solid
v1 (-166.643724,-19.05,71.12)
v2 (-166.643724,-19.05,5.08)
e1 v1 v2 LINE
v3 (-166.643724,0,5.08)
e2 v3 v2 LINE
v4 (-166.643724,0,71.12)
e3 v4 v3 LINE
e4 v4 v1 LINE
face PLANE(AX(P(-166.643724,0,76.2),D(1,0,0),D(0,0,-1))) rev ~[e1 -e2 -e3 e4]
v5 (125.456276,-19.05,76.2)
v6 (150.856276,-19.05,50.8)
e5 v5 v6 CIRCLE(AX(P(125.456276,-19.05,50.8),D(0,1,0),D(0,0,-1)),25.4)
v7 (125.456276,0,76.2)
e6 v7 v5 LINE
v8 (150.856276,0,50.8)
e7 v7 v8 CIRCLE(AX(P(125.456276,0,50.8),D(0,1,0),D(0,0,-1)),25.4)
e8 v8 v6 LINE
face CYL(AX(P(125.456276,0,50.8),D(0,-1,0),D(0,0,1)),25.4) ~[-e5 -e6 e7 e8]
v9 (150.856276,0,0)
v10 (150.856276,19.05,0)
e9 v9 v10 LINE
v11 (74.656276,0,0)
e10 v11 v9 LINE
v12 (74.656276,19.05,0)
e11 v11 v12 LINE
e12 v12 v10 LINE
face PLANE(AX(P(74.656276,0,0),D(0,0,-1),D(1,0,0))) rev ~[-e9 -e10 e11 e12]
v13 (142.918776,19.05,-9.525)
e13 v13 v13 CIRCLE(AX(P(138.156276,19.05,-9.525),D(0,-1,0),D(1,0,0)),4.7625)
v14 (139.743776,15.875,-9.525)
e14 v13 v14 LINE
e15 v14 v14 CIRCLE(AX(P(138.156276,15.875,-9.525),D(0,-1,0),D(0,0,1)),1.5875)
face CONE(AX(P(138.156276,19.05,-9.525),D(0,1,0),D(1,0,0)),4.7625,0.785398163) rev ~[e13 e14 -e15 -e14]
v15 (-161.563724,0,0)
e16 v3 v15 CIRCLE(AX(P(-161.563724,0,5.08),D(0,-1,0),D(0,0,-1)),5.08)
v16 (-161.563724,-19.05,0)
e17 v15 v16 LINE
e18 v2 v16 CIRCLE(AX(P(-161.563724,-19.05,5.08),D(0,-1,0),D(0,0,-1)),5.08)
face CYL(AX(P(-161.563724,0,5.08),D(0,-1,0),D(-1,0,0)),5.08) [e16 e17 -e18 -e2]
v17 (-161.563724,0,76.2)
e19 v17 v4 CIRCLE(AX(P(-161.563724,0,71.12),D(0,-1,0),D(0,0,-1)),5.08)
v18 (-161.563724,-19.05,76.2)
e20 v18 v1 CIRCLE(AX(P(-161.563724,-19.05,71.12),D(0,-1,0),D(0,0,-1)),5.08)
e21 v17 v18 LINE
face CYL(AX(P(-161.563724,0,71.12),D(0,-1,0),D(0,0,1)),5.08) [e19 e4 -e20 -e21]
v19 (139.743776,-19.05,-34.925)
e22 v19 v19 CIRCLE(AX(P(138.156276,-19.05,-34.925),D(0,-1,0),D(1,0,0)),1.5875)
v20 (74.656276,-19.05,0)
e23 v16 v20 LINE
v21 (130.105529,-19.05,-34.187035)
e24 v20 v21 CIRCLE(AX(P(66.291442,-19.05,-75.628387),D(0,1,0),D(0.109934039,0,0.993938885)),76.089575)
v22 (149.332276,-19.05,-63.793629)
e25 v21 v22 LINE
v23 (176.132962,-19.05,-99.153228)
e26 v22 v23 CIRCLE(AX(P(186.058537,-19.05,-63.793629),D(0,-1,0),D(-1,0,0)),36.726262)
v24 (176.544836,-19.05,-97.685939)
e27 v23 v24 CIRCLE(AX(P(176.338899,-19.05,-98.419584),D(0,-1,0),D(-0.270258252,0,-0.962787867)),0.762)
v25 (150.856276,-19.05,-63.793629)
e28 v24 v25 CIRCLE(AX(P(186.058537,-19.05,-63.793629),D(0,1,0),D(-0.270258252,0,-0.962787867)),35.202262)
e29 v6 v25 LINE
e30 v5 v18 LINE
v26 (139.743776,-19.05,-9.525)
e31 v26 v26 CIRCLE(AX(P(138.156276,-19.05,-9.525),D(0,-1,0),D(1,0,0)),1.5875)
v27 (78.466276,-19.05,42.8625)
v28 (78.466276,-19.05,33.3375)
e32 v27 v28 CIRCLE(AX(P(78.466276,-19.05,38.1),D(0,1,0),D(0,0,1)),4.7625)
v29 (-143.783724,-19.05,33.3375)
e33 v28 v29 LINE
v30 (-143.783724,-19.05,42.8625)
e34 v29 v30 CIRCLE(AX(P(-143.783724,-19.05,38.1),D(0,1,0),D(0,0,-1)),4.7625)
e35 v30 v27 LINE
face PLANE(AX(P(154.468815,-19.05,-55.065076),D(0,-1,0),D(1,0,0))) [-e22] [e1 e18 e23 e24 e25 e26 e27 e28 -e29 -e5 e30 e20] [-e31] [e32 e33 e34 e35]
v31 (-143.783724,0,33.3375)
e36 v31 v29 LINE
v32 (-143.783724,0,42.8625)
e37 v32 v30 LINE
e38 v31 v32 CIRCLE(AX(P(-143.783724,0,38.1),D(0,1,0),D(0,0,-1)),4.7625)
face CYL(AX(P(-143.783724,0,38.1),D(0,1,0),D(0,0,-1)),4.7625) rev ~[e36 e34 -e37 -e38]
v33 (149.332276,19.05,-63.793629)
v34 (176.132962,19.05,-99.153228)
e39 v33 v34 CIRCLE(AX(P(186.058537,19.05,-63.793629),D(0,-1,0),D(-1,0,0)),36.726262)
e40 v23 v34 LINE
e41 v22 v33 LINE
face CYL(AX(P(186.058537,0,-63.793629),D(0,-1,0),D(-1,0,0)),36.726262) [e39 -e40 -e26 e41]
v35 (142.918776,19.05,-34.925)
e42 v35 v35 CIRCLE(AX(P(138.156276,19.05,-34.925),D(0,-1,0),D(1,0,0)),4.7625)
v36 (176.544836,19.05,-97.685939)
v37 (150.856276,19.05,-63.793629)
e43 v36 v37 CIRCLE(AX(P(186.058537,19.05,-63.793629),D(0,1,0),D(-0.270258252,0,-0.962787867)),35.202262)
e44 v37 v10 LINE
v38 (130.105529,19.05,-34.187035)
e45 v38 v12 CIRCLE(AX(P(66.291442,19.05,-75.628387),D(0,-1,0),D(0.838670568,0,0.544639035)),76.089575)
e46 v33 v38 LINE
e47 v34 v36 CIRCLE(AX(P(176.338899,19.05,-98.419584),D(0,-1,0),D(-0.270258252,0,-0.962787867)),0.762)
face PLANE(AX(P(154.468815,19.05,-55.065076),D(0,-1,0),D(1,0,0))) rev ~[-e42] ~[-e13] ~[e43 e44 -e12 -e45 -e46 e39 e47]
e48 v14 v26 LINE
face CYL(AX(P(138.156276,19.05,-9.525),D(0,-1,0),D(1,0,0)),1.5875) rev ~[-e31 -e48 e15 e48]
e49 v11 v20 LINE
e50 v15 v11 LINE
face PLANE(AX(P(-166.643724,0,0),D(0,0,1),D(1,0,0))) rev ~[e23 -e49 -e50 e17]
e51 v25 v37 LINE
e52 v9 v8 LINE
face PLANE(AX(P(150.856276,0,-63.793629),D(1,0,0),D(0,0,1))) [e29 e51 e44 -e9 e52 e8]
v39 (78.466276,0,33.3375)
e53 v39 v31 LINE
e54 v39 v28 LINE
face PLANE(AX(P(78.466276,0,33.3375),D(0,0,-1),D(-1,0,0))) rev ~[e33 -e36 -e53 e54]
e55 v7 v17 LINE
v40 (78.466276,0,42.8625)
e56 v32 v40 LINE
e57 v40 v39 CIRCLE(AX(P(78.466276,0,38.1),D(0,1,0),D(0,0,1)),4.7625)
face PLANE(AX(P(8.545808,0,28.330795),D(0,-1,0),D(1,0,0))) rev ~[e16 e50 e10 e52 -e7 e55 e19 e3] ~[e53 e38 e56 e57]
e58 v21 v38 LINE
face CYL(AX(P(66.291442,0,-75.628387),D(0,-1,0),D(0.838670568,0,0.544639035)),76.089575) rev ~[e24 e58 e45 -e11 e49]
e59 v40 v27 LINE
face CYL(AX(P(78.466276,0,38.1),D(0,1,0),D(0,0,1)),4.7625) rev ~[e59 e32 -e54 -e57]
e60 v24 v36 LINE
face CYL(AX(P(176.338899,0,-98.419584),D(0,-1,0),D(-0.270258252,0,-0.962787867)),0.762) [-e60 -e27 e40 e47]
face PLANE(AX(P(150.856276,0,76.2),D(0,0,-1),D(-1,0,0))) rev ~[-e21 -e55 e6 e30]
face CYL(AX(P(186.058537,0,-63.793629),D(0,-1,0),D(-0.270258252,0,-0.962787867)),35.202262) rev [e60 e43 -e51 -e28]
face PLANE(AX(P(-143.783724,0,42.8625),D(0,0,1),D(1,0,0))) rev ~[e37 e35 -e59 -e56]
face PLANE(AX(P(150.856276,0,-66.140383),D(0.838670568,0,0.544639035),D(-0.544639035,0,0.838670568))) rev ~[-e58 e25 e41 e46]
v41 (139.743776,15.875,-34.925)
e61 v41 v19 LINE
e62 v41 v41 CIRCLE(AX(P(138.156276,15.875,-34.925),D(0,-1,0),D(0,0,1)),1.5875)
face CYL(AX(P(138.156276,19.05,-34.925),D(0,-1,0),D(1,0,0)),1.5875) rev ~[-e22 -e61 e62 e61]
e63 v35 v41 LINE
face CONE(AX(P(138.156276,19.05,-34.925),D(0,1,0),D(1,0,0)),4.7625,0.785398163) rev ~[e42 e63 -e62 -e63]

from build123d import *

# Parameters (mm, degrees)
F0_R           = 1.3992842893
F1_DEPTH       = 19.05
F2_R           = 5.08
F3_R           = 25.4
F4_R           = 1.3992842893
F5_DEPTH       = 19.05
F7_D           = 3.175
F7_CSINK_D     = 9.525
F7_CSINK_ANGLE = 90
F9_DEPTH       = 38.101
F11_DEPTH      = 19.05
F11_DEPTH_BACK = 19.05


with BuildPart() as f1:
    # F0 (on Front) → F1 (new body)
    with BuildSketch(Plane.XZ):
        with BuildLine():
            Line((150.8562757823, 76.2), (-166.6437242177, 76.2))
            Line((-166.6437242177, 76.2), (-166.6437242177, 0))
            Line((-166.6437242177, 0), (74.6562757823, 0))
            ThreePointArc((74.6562757823, 0), (106.2243540544, -10.8596763882), (130.1055285482, -34.187034615))
            Line((130.1055285482, -34.187034615), (150.8562757823, -66.1403832537))
            Line((150.8562757823, -66.1403832537), (150.8562757823, 76.2))
        make_face()
        with Locations((138.1562757823, -34.925)):
            Circle(F0_R, mode=Mode.SUBTRACT)
        with Locations((138.1562757823, -9.525)):
            Circle(F0_R, mode=Mode.SUBTRACT)
        with BuildLine():
            Line((78.4662757823, 33.3375), (-143.7837242177, 33.3375))
            ThreePointArc((-143.7837242177, 33.3375), (-148.5462242177, 38.1), (-143.7837242177, 42.8625))
            Line((-143.7837242177, 42.8625), (78.4662757823, 42.8625))
            ThreePointArc((78.4662757823, 42.8625), (83.2287757823, 38.1), (78.4662757823, 33.3375))
        make_face(mode=Mode.SUBTRACT)
        with Locations((138.1562757823, -34.925)):
            Circle(F0_R)
        with Locations((138.1562757823, -9.525)):
            Circle(F0_R)
    extrude(amount=F1_DEPTH)

    # F2
    f2_edges = [f1.edges().sort_by_distance(p)[0] for p in [
        (-166.643724, -9.525, 76.2),
        (-166.643724, -9.525, 0),
    ]]
    fillet(f2_edges, radius=F2_R)

    # F3
    f3_edges = [f1.edges().sort_by_distance(p)[0] for p in [
        (150.856276, -9.525, 76.2),
    ]]
    fillet(f3_edges, radius=F3_R)

    # F4 (on face) → F5 (join)
    with BuildSketch(Plane(origin=(0, 0, 0), x_dir=(-1, 0, 0), z_dir=(0, 1, 0))):
        with BuildLine():
            Line((-150.8562757823, 0), (-150.8562757823, -66.1403832537))
            Line((-150.8562757823, -66.1403832537), (-130.1055285482, -34.187034615))
            ThreePointArc((-130.1055285482, -34.187034615), (-106.2243540544, -10.8596763882), (-74.6562757823, 0))
            Line((-74.6562757823, 0), (-150.8562757823, 0))
        make_face()
        with Locations((-138.1562757823, -34.925)):
            Circle(F4_R, mode=Mode.SUBTRACT)
        with Locations((-138.1562757823, -9.525)):
            Circle(F4_R, mode=Mode.SUBTRACT)
        with Locations((-138.1562757823, -34.925)):
            Circle(F4_R)
        with Locations((-138.1562757823, -9.525)):
            Circle(F4_R)
    extrude(amount=F5_DEPTH)

    # F7 (through all)
    with Locations(Plane(origin=(0, 19.05, 0), x_dir=(-1, 0, 0), z_dir=(0, 1, 0))):
        with Locations((-138.1562757823, -34.925), (-138.1562757823, -9.525)):
            CounterSinkHole(F7_D / 2, F7_CSINK_D / 2, counter_sink_angle=F7_CSINK_ANGLE)

    # F8 (on face) → F9 (cut, through all)
    with BuildSketch(Plane.XZ.offset(19.05)):
        Polygon((150.8562757823, -66.1403832537), (150.8562757823, -2.6403832537), (149.3322757823, -2.6403832537), (149.3322757823, -63.7936290488), align=None)
    extrude(amount=-F9_DEPTH, mode=Mode.SUBTRACT)

    # F10 (on Front) → F11 (join, two sides)
    with BuildSketch(Plane.XZ) as f11_sk:
        with BuildLine():
            Line((150.8562757823, -63.7936290488), (150.8562757823, -2.6403832537))
            Line((150.8562757823, -2.6403832537), (149.3322757823, -2.6403832537))
            Line((149.3322757823, -2.6403832537), (149.3322757823, -63.7936290488))
            ThreePointArc((149.3322757823, -63.7936290488), (156.7895472638, -85.9779592892), (176.1329621077, -99.1532281041))
            ThreePointArc((176.1329621077, -99.1532281041), (177.0725432504, -98.6255205372), (176.5448356835, -97.6859393944))
            ThreePointArc((176.5448356835, -97.6859393944), (158.004098895, -85.0573940633), (150.8562757823, -63.7936290488))
        make_face()
    extrude(amount=F11_DEPTH)
    extrude(f11_sk.sketch, amount=-F11_DEPTH_BACK)


solid = f1.part
